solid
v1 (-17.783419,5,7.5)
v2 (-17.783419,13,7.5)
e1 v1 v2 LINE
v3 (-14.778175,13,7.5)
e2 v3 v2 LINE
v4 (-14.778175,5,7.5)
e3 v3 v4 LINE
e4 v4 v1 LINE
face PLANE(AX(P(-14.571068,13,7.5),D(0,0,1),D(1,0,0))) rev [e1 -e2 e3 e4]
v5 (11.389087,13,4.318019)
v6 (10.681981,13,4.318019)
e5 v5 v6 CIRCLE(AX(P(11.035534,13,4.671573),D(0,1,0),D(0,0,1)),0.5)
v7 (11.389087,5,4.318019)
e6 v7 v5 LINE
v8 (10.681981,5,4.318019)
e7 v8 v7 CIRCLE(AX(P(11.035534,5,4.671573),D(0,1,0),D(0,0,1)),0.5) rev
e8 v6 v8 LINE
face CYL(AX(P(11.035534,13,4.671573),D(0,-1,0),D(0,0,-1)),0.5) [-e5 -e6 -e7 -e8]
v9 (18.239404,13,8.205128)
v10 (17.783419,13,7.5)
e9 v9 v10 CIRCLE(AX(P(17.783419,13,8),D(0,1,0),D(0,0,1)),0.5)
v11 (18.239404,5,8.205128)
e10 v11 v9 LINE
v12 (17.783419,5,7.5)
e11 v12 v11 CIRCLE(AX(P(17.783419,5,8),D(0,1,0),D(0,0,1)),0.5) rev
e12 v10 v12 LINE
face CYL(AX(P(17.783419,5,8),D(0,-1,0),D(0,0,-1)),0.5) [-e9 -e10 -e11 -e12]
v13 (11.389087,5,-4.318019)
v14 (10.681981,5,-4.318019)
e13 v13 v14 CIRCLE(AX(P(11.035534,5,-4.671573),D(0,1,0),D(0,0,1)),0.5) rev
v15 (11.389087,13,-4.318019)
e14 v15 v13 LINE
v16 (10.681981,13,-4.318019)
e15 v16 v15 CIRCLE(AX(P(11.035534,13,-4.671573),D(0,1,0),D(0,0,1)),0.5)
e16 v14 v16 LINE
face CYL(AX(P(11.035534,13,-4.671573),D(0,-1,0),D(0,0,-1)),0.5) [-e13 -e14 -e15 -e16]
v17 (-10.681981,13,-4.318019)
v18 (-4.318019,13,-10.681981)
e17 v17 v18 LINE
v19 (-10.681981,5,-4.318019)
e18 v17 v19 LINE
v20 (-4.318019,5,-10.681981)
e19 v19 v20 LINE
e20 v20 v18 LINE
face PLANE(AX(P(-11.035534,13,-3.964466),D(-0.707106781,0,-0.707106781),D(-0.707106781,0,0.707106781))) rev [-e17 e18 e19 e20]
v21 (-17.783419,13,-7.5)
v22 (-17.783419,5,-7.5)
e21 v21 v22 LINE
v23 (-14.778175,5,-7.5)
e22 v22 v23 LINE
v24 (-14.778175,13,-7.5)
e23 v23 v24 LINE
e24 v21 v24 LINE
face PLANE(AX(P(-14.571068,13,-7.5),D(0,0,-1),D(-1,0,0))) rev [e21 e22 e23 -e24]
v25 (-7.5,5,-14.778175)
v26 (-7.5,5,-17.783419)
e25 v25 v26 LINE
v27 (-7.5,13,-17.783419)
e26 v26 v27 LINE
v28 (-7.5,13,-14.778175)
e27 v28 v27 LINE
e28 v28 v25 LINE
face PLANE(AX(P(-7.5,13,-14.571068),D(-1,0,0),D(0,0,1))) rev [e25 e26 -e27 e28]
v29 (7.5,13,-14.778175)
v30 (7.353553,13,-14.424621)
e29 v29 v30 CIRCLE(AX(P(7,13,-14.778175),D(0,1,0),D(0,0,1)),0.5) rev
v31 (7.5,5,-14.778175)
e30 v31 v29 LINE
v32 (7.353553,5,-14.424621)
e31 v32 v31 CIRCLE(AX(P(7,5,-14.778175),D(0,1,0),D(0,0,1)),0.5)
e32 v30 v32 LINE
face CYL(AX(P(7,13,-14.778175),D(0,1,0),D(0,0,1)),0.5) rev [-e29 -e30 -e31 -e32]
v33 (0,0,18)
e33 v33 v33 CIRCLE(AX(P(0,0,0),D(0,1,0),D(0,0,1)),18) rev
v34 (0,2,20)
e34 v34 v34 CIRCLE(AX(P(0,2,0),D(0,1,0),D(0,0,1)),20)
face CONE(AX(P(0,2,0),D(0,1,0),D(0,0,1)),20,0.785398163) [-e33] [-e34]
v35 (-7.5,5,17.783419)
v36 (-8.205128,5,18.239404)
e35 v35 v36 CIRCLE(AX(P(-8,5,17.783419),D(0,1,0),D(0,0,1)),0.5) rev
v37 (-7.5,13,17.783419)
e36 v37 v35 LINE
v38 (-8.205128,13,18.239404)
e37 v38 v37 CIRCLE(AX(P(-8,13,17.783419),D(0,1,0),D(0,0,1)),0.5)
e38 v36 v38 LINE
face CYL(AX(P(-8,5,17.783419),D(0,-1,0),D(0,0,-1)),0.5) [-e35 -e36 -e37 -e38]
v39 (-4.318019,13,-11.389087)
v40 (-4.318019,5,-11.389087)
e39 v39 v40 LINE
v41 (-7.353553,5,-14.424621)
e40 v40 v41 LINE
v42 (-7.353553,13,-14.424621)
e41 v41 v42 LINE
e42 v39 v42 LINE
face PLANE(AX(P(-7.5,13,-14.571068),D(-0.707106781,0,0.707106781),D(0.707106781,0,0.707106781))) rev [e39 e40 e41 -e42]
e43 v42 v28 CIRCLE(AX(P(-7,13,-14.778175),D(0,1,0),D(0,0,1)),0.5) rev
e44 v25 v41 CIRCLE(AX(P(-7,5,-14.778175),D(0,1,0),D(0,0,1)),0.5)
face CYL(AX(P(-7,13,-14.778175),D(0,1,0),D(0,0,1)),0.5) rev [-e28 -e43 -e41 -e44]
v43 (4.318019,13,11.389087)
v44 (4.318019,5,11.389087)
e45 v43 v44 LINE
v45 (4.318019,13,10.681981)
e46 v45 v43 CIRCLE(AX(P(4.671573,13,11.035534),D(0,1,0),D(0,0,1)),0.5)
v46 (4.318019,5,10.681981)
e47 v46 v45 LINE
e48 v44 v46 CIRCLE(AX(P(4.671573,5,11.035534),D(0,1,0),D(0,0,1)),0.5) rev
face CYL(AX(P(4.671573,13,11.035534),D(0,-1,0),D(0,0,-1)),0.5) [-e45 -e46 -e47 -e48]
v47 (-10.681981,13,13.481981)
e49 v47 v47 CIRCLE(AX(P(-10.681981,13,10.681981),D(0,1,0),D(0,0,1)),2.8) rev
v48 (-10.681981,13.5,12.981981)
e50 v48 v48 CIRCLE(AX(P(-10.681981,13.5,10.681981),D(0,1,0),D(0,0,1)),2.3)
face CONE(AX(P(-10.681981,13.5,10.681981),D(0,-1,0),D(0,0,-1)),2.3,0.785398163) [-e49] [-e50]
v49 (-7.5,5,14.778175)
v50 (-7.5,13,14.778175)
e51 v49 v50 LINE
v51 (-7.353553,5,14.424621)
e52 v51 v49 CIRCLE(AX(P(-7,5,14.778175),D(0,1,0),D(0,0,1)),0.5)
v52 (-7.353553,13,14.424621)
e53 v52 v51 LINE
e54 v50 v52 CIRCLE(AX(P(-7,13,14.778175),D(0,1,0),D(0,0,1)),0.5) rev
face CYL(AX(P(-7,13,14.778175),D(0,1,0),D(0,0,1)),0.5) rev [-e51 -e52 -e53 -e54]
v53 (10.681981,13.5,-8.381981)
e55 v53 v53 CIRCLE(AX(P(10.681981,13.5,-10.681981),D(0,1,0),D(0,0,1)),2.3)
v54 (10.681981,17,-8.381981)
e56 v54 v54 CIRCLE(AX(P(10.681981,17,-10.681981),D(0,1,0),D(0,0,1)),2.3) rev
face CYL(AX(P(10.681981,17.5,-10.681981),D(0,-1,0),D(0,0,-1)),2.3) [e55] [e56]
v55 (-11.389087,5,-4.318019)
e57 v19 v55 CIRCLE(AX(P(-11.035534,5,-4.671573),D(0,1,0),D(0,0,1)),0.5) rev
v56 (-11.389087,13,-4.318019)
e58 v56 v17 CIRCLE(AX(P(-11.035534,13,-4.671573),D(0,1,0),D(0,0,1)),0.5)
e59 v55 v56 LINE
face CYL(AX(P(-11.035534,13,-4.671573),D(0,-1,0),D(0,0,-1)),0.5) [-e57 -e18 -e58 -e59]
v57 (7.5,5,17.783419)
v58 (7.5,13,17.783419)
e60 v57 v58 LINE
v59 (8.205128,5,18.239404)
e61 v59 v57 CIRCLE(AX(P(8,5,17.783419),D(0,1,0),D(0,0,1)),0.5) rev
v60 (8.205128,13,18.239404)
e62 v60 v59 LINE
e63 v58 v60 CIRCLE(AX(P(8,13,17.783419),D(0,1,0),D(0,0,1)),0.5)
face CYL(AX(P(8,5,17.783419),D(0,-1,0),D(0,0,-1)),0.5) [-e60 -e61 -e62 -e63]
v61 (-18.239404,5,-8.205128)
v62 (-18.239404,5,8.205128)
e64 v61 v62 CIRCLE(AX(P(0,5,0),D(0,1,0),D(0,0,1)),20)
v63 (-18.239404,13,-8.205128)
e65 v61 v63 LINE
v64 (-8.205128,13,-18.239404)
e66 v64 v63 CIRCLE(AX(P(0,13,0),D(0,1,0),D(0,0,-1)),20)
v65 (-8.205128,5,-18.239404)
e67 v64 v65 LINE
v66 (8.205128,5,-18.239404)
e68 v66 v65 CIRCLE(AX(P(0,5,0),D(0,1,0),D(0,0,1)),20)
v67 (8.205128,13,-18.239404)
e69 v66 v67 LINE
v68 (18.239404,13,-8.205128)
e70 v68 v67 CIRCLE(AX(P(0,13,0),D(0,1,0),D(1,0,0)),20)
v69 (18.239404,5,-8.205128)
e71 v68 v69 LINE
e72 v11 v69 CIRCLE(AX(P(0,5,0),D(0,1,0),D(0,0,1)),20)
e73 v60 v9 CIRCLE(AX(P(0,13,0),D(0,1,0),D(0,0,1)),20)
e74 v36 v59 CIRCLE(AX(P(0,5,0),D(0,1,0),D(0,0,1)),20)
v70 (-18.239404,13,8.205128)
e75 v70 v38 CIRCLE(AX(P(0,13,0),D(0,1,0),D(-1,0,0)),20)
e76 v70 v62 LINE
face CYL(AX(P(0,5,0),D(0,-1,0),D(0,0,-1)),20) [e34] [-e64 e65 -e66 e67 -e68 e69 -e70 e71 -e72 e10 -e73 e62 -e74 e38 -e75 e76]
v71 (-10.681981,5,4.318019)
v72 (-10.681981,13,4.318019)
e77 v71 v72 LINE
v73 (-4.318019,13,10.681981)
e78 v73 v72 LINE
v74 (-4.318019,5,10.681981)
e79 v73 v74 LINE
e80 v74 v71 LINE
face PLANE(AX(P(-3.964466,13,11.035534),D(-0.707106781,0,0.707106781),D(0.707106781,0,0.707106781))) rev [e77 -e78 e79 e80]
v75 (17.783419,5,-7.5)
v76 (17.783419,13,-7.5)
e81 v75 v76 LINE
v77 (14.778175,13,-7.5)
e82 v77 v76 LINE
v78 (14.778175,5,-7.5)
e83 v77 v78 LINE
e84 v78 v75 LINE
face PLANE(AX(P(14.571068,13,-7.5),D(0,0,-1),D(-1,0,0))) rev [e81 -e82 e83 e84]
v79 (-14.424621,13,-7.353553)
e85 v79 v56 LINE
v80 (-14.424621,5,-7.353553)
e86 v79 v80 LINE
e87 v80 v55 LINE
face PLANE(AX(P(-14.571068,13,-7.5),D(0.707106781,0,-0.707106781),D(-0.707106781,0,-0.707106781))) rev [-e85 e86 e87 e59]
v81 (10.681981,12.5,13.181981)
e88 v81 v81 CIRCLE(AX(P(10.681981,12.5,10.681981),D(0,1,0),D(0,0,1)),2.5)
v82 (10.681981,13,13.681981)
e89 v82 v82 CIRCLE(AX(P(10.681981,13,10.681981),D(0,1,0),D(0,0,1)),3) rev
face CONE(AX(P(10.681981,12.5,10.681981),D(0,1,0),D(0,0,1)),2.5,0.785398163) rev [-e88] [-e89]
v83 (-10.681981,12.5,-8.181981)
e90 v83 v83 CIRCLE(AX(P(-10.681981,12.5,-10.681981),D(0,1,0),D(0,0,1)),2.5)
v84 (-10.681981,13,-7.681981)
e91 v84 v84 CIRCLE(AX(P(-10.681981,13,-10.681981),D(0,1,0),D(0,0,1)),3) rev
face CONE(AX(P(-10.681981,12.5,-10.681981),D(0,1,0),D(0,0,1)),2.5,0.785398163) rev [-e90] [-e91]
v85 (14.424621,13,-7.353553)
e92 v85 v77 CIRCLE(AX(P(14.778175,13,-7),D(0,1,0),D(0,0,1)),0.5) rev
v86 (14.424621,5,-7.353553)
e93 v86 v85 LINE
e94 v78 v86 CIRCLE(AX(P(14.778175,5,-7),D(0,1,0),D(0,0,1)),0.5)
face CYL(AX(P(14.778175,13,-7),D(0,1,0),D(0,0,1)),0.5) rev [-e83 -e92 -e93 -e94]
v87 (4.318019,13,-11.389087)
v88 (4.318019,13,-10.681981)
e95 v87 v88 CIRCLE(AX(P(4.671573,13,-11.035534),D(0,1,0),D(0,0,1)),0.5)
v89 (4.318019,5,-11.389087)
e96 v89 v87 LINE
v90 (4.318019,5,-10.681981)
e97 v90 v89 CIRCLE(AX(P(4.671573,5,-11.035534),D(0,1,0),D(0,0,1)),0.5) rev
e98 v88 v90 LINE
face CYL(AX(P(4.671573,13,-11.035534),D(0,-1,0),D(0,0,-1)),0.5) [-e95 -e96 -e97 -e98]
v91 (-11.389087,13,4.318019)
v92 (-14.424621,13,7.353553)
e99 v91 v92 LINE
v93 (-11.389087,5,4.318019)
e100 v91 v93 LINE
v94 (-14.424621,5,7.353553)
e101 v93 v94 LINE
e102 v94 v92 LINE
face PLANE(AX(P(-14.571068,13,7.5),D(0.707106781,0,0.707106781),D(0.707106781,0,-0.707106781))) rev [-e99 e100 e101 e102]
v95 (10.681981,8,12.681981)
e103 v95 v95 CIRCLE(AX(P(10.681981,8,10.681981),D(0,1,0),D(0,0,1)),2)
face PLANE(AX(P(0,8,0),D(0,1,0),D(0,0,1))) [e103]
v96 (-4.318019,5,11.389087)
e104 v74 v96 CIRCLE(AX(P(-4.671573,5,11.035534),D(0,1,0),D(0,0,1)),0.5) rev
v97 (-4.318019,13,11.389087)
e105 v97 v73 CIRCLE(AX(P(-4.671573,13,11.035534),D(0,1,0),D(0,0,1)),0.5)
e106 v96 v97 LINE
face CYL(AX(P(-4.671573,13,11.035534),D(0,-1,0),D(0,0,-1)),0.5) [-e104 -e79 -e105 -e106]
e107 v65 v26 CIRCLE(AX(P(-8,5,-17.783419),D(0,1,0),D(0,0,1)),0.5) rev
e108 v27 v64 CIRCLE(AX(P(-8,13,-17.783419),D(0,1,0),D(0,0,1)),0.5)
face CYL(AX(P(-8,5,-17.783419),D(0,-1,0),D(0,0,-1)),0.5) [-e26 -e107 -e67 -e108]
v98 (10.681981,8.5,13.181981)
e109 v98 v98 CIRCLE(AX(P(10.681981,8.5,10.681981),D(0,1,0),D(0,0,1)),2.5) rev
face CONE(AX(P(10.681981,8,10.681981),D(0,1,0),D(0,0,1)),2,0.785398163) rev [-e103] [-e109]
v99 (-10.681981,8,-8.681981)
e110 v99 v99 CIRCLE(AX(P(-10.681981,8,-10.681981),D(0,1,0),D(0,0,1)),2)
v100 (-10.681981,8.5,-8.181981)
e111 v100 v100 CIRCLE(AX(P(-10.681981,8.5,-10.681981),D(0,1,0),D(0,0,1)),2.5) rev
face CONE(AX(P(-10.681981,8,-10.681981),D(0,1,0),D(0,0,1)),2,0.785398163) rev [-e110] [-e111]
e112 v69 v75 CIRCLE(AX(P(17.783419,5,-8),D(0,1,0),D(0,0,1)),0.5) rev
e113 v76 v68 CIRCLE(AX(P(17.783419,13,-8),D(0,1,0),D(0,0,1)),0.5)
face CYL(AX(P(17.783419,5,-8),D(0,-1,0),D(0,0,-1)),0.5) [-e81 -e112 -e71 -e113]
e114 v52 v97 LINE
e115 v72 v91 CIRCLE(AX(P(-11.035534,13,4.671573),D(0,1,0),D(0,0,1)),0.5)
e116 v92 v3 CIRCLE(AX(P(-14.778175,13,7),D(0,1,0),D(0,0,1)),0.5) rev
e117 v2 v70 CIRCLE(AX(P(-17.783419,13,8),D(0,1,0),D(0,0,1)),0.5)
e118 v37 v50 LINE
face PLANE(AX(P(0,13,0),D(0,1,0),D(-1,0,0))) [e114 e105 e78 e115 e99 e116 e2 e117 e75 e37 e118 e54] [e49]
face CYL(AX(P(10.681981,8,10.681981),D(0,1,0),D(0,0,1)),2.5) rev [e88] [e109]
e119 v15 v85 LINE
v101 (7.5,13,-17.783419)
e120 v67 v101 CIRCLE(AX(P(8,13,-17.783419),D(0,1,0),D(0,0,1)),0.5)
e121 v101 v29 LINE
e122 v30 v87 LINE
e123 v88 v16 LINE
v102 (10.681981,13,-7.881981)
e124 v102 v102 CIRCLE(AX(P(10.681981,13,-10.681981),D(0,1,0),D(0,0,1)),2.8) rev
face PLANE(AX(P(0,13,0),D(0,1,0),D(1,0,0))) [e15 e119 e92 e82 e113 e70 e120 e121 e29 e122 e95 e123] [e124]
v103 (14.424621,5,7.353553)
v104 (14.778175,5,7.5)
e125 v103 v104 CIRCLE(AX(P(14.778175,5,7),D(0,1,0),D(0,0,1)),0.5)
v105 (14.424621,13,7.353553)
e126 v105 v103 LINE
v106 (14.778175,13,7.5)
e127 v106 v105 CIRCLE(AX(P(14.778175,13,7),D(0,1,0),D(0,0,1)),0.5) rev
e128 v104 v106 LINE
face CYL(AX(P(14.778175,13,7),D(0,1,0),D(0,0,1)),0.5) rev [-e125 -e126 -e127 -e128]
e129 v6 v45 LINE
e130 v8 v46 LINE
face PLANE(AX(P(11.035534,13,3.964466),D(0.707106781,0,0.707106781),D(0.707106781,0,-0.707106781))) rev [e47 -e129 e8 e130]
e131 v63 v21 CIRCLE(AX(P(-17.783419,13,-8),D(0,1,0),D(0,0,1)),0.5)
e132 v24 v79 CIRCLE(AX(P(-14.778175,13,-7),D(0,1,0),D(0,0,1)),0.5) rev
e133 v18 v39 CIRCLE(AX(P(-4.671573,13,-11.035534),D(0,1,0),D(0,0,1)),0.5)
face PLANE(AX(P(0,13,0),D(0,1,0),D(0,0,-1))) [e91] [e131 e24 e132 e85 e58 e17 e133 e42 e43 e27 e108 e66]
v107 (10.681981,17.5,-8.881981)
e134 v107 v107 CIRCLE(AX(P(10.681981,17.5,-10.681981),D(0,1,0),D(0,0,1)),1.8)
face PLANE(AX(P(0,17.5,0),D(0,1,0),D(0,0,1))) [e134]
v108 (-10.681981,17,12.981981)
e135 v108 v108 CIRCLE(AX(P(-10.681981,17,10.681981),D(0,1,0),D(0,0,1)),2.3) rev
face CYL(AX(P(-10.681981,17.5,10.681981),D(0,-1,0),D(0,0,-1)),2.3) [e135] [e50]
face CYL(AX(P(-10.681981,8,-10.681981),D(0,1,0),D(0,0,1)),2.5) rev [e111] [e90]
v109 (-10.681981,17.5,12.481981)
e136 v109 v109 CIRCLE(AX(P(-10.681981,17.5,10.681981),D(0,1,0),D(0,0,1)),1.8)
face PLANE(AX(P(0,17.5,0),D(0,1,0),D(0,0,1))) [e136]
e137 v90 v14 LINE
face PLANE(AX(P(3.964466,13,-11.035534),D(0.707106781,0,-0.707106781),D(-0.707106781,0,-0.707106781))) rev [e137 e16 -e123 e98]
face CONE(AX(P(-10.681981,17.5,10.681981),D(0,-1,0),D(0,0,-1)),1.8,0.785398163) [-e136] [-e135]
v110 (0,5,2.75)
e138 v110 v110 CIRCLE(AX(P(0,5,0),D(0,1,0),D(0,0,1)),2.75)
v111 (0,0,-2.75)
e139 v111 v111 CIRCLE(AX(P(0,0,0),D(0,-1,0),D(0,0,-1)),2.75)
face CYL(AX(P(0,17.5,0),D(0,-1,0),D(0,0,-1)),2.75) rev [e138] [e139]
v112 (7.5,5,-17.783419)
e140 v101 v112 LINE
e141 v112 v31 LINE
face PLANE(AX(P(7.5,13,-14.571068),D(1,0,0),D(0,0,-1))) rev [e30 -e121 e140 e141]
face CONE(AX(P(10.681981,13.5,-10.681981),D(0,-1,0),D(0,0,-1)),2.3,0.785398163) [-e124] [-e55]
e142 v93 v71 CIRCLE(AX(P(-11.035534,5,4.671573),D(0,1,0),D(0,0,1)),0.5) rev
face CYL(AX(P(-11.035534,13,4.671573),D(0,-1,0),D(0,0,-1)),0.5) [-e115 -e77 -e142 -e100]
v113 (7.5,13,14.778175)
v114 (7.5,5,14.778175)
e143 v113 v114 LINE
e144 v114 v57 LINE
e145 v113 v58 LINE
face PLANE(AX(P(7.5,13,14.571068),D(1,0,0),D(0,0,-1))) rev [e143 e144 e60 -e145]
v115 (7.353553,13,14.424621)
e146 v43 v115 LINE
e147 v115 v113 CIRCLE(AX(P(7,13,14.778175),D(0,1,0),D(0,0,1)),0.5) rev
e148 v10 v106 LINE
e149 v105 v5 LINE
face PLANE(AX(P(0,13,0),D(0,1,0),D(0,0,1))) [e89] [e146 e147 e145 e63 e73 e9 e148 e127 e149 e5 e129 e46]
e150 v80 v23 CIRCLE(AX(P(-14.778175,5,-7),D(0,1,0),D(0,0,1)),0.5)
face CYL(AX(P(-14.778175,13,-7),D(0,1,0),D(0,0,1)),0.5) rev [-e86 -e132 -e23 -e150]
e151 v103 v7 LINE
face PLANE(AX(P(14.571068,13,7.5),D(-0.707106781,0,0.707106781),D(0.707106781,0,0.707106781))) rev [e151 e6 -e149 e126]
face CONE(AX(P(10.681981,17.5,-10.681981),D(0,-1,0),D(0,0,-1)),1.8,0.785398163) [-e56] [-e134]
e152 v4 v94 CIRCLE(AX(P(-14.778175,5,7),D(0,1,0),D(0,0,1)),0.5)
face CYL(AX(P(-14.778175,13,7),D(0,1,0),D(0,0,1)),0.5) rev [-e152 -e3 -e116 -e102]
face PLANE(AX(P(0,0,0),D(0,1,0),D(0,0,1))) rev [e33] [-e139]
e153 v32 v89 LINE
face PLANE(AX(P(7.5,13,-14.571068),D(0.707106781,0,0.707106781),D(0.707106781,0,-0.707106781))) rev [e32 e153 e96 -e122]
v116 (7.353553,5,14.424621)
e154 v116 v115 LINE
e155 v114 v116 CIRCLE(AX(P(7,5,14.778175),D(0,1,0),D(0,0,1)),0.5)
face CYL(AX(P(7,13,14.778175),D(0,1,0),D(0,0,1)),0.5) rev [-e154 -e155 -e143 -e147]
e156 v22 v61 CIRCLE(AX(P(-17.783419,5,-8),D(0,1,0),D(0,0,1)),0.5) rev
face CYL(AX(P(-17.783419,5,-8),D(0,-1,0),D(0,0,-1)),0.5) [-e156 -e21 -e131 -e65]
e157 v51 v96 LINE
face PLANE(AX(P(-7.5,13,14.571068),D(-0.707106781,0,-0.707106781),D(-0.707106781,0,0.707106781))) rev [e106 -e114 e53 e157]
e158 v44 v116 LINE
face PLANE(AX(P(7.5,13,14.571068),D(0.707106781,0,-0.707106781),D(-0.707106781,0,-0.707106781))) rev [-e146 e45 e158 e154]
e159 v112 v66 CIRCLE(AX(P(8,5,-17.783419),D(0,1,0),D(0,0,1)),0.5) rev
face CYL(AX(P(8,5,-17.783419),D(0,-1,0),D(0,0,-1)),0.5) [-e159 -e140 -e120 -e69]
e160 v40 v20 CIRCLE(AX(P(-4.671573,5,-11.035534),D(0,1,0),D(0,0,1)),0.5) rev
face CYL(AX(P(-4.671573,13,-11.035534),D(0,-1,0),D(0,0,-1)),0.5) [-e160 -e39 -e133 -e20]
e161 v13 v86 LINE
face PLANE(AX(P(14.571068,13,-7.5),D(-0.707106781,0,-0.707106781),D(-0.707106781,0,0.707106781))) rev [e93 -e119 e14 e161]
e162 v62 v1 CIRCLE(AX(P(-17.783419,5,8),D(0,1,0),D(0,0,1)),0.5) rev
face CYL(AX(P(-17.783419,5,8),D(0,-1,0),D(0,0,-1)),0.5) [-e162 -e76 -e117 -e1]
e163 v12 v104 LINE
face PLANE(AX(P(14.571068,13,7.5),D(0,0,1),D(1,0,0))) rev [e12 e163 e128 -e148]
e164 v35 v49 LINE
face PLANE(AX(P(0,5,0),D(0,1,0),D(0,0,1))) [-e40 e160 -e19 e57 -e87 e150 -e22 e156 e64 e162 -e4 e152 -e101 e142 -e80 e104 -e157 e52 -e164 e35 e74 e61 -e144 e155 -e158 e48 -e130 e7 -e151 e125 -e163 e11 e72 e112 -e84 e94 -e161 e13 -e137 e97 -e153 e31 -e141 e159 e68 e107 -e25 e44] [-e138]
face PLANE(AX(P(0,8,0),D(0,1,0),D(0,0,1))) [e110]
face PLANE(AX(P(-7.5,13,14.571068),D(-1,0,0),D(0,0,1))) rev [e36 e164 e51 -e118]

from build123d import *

# Parameters (mm, degrees)
SKETCH_1_R               = 20
EXTRUDE_1_DEPTH          = 5
EXTRUDE_2_DEPTH          = 8
FILLET_1_R               = 0.5
PATTERN_START            = 5
PATTERN_CIRCULAR_1_DEPTH = 8
SKETCH_3_R               = 2.5000000000000004
CUT_EXTRUDE_1_DEPTH      = 5
EXTRUDE_START            = 4.5
SKETCH_3_3_R             = 2.5000000000000004
SKETCH_3_3_R_2           = 2.2999999999999994
EXTRUDE_3_DEPTH          = 4.5
CHAMFER_1_SIZE           = 0.5
SKETCH_4_R               = 2.75
CUT_EXTRUDE_2_DEPTH      = 34.26033673912518
CHAMFER_2_SIZE           = 2


# Read off the part's stored shape, not the designer's step: 阵列(圆周)1
with BuildPart() as part:
    # 草图1 → 凸台-拉伸1 (new body)
    with BuildSketch(Plane(origin=(0, 0, 0), x_dir=(1, 0, 0), z_dir=(0, 1, 0))):
        with Locations(Location((0, 0, 0), (0, 0, 270))):
            Circle(SKETCH_1_R)
    extrude(amount=EXTRUDE_1_DEPTH)

    # 草图2 → 凸台-拉伸2 (add)
    with BuildSketch(Plane(origin=(0, 5, 0), x_dir=(1, 0, 0), z_dir=(0, 1, 0))):
        with BuildLine():
            Line((14.57106781186547, -7.500000000000001), (11.035533905932741, -3.9644660940672627))
            Line((11.035533905932741, -3.9644660940672627), (3.9644660940672627, -11.03553390593274))
            Line((3.9644660940672627, -11.03553390593274), (7.500000000000001, -14.571067811865477))
            Line((7.500000000000001, -14.571067811865477), (7.500000000000001, -18.540496217739157))
            ThreePointArc((7.500000000000001, -18.540496217739157), (14.142135623730951, -14.14213562373095), (18.540496217739157, -7.500000000000001))
            Line((18.540496217739157, -7.500000000000001), (14.57106781186547, -7.500000000000001))
        make_face()
    extrude(amount=EXTRUDE_2_DEPTH)

    # 圆角1
    fillet_1_edges = [part.edges().sort_by_distance(p)[0] for p in [
        (7.500000000000001, 9, 14.571067811865477),
        (7.500000000000001, 9, 18.540496217739157),
        (18.540496217739154, 9, 7.500000000000002),
        (14.57106781186547, 9, 7.500000000000001),
        (11.035533905932741, 9, 3.9644660940672627),
        (3.9644660940672627, 9, 11.03553390593274),
    ]]
    fillet(fillet_1_edges, radius=FILLET_1_R)

    # 阵列(圆周)1 outline → 阵列(圆周)1 (add)
    with BuildSketch(Plane(origin=(0, 0, 0), x_dir=(1, 0, 0), z_dir=(0, 1, 0)).offset(PATTERN_START)):
        with BuildLine():
            ThreePointArc((17.783419244, 7.5), (18.203278805, 7.728489505), (18.239404353, 8.205128205))
            ThreePointArc((18.239404353, 8.205128205), (14.142135624, 14.142135624), (8.205128205, 18.239404353))
            ThreePointArc((8.205128205, 18.239404353), (7.728489505, 18.203278805), (7.5, 17.783419244))
            Line((7.5, 17.783419244), (7.5, 14.778174593))
            ThreePointArc((7.5, 14.778174593), (7.461939766, 14.586832877), (7.353553391, 14.424621202))
            Line((7.353553391, 14.424621202), (4.318019485, 11.389087297))
            ThreePointArc((4.318019485, 11.389087297), (4.171572875, 11.035533906), (4.318019485, 10.681980515))
            Line((4.318019485, 10.681980515), (10.681980515, 4.318019485))
            ThreePointArc((10.681980515, 4.318019485), (11.035533906, 4.171572875), (11.389087297, 4.318019485))
            Line((11.389087297, 4.318019485), (14.424621202, 7.353553391))
            ThreePointArc((14.424621202, 7.353553391), (14.586832877, 7.461939766), (14.778174593, 7.5))
            Line((14.778174593, 7.5), (17.783419244, 7.5))
        make_face()
        with BuildLine():
            ThreePointArc((-18.239404353, -8.205128205), (-14.142135624, -14.142135624), (-8.205128205, -18.239404353))
            ThreePointArc((-8.205128205, -18.239404353), (-7.728489505, -18.203278805), (-7.5, -17.783419244))
            Line((-7.5, -17.783419244), (-7.5, -14.778174593))
            ThreePointArc((-7.5, -14.778174593), (-7.461939766, -14.586832877), (-7.353553391, -14.424621202))
            Line((-7.353553391, -14.424621202), (-4.318019485, -11.389087297))
            ThreePointArc((-4.318019485, -11.389087297), (-4.171572875, -11.035533906), (-4.318019485, -10.681980515))
            Line((-4.318019485, -10.681980515), (-10.681980515, -4.318019485))
            ThreePointArc((-10.681980515, -4.318019485), (-11.035533906, -4.171572875), (-11.389087297, -4.318019485))
            Line((-11.389087297, -4.318019485), (-14.424621202, -7.353553391))
            ThreePointArc((-14.424621202, -7.353553391), (-14.586832877, -7.461939766), (-14.778174593, -7.5))
            Line((-14.778174593, -7.5), (-17.783419244, -7.5))
            ThreePointArc((-17.783419244, -7.5), (-18.203278805, -7.728489505), (-18.239404353, -8.205128205))
        make_face()
        with BuildLine():
            ThreePointArc((-7.5, 17.783419244), (-7.728489505, 18.203278805), (-8.205128205, 18.239404353))
            ThreePointArc((-8.205128205, 18.239404353), (-14.142135624, 14.142135624), (-18.239404353, 8.205128205))
            ThreePointArc((-18.239404353, 8.205128205), (-18.203278805, 7.728489505), (-17.783419244, 7.5))
            Line((-17.783419244, 7.5), (-14.778174593, 7.5))
            ThreePointArc((-14.778174593, 7.5), (-14.586832877, 7.461939766), (-14.424621202, 7.353553391))
            Line((-14.424621202, 7.353553391), (-11.389087297, 4.318019485))
            ThreePointArc((-11.389087297, 4.318019485), (-11.035533906, 4.171572875), (-10.681980515, 4.318019485))
            Line((-10.681980515, 4.318019485), (-4.318019485, 10.681980515))
            ThreePointArc((-4.318019485, 10.681980515), (-4.171572875, 11.035533906), (-4.318019485, 11.389087297))
            Line((-4.318019485, 11.389087297), (-7.353553391, 14.424621202))
            ThreePointArc((-7.353553391, 14.424621202), (-7.461939766, 14.586832877), (-7.5, 14.778174593))
            Line((-7.5, 14.778174593), (-7.5, 17.783419244))
        make_face()
    extrude(amount=PATTERN_CIRCULAR_1_DEPTH)

    # 草图3 → 切除-拉伸1 (cut)
    with BuildSketch(Plane(origin=(0, 13.000000000000002, 0), x_dir=(1, 0, 0), z_dir=(0, 1, 0))):
        with Locations(Location((-10.681980515339466, 10.681980515339463, 0), (0, 0, 270))):
            Circle(SKETCH_3_R)
        with Locations(Location((10.681980515339466, -10.681980515339463, 0), (0, 0, 270))):
            Circle(SKETCH_3_R)
    extrude(amount=-CUT_EXTRUDE_1_DEPTH, mode=Mode.SUBTRACT)

    # 草图3<3> → 凸台-拉伸3 (add)
    with BuildSketch(Plane(origin=(0, 13.000000000000002, 0), x_dir=(1, 0, 0), z_dir=(0, 1, 0)).offset(EXTRUDE_START)):
        with Locations(Location((10.681980515339466, -10.681980515339463, 0), (0, 0, 270))):
            Circle(SKETCH_3_3_R)
        with Locations(Location((-10.681980515339466, 10.681980515339463, 0), (0, 0, 270))):
            Circle(SKETCH_3_3_R)
        with Locations(Location((10.681980515339466, 10.681980515339463, 0), (0, 0, 270))):
            Circle(SKETCH_3_3_R_2)
        with Locations(Location((-10.681980515339465, -10.681980515339465, 0), (0, 0, 270))):
            Circle(SKETCH_3_3_R_2)
    extrude(amount=-EXTRUDE_3_DEPTH)


with BuildPart() as extrude_3_kept_piece:
    # of the separate pieces the step leaves, the one the design keeps (extrude_3_pieces_kept)
    add(part.part.solids().sort_by_distance((8.205128205, 5, 18.239404353))[0])

    # 倒角1
    chamfer_1_edges = [extrude_3_kept_piece.edges().sort_by_distance(p)[0] for p in [
        (-10.681980515339466, 8.000000000000002, -13.181980515339463),
        (-10.681980515339466, 13.000000000000002, -13.181980515339463),
        (10.681980515339466, 8.000000000000002, 8.181980515339463),
        (10.681980515339466, 13.000000000000002, 8.181980515339463),
        (10.681980515339466, 13.000000000000002, -12.981980515339462),
        (10.681980515339466, 17.5, -12.981980515339462),
        (-10.681980515339465, 13.000000000000002, 8.381980515339466),
        (-10.681980515339465, 17.5, 8.381980515339466),
    ]]
    chamfer(chamfer_1_edges, length=CHAMFER_1_SIZE)

    # 草图4 → 切除-拉伸2 (cut, through all)
    with BuildSketch(Plane.XZ):
        with Locations(Location((0, 0, 0), (0, 0, 270))):
            Circle(SKETCH_4_R)
    extrude(amount=-CUT_EXTRUDE_2_DEPTH, mode=Mode.SUBTRACT)

    # 倒角2
    chamfer_2_edges = [extrude_3_kept_piece.edges().sort_by_distance(p)[0] for p in [
        (6.12e-15, 0, -20),
    ]]
    chamfer(chamfer_2_edges, length=CHAMFER_2_SIZE)


solid = extrude_3_kept_piece.part
